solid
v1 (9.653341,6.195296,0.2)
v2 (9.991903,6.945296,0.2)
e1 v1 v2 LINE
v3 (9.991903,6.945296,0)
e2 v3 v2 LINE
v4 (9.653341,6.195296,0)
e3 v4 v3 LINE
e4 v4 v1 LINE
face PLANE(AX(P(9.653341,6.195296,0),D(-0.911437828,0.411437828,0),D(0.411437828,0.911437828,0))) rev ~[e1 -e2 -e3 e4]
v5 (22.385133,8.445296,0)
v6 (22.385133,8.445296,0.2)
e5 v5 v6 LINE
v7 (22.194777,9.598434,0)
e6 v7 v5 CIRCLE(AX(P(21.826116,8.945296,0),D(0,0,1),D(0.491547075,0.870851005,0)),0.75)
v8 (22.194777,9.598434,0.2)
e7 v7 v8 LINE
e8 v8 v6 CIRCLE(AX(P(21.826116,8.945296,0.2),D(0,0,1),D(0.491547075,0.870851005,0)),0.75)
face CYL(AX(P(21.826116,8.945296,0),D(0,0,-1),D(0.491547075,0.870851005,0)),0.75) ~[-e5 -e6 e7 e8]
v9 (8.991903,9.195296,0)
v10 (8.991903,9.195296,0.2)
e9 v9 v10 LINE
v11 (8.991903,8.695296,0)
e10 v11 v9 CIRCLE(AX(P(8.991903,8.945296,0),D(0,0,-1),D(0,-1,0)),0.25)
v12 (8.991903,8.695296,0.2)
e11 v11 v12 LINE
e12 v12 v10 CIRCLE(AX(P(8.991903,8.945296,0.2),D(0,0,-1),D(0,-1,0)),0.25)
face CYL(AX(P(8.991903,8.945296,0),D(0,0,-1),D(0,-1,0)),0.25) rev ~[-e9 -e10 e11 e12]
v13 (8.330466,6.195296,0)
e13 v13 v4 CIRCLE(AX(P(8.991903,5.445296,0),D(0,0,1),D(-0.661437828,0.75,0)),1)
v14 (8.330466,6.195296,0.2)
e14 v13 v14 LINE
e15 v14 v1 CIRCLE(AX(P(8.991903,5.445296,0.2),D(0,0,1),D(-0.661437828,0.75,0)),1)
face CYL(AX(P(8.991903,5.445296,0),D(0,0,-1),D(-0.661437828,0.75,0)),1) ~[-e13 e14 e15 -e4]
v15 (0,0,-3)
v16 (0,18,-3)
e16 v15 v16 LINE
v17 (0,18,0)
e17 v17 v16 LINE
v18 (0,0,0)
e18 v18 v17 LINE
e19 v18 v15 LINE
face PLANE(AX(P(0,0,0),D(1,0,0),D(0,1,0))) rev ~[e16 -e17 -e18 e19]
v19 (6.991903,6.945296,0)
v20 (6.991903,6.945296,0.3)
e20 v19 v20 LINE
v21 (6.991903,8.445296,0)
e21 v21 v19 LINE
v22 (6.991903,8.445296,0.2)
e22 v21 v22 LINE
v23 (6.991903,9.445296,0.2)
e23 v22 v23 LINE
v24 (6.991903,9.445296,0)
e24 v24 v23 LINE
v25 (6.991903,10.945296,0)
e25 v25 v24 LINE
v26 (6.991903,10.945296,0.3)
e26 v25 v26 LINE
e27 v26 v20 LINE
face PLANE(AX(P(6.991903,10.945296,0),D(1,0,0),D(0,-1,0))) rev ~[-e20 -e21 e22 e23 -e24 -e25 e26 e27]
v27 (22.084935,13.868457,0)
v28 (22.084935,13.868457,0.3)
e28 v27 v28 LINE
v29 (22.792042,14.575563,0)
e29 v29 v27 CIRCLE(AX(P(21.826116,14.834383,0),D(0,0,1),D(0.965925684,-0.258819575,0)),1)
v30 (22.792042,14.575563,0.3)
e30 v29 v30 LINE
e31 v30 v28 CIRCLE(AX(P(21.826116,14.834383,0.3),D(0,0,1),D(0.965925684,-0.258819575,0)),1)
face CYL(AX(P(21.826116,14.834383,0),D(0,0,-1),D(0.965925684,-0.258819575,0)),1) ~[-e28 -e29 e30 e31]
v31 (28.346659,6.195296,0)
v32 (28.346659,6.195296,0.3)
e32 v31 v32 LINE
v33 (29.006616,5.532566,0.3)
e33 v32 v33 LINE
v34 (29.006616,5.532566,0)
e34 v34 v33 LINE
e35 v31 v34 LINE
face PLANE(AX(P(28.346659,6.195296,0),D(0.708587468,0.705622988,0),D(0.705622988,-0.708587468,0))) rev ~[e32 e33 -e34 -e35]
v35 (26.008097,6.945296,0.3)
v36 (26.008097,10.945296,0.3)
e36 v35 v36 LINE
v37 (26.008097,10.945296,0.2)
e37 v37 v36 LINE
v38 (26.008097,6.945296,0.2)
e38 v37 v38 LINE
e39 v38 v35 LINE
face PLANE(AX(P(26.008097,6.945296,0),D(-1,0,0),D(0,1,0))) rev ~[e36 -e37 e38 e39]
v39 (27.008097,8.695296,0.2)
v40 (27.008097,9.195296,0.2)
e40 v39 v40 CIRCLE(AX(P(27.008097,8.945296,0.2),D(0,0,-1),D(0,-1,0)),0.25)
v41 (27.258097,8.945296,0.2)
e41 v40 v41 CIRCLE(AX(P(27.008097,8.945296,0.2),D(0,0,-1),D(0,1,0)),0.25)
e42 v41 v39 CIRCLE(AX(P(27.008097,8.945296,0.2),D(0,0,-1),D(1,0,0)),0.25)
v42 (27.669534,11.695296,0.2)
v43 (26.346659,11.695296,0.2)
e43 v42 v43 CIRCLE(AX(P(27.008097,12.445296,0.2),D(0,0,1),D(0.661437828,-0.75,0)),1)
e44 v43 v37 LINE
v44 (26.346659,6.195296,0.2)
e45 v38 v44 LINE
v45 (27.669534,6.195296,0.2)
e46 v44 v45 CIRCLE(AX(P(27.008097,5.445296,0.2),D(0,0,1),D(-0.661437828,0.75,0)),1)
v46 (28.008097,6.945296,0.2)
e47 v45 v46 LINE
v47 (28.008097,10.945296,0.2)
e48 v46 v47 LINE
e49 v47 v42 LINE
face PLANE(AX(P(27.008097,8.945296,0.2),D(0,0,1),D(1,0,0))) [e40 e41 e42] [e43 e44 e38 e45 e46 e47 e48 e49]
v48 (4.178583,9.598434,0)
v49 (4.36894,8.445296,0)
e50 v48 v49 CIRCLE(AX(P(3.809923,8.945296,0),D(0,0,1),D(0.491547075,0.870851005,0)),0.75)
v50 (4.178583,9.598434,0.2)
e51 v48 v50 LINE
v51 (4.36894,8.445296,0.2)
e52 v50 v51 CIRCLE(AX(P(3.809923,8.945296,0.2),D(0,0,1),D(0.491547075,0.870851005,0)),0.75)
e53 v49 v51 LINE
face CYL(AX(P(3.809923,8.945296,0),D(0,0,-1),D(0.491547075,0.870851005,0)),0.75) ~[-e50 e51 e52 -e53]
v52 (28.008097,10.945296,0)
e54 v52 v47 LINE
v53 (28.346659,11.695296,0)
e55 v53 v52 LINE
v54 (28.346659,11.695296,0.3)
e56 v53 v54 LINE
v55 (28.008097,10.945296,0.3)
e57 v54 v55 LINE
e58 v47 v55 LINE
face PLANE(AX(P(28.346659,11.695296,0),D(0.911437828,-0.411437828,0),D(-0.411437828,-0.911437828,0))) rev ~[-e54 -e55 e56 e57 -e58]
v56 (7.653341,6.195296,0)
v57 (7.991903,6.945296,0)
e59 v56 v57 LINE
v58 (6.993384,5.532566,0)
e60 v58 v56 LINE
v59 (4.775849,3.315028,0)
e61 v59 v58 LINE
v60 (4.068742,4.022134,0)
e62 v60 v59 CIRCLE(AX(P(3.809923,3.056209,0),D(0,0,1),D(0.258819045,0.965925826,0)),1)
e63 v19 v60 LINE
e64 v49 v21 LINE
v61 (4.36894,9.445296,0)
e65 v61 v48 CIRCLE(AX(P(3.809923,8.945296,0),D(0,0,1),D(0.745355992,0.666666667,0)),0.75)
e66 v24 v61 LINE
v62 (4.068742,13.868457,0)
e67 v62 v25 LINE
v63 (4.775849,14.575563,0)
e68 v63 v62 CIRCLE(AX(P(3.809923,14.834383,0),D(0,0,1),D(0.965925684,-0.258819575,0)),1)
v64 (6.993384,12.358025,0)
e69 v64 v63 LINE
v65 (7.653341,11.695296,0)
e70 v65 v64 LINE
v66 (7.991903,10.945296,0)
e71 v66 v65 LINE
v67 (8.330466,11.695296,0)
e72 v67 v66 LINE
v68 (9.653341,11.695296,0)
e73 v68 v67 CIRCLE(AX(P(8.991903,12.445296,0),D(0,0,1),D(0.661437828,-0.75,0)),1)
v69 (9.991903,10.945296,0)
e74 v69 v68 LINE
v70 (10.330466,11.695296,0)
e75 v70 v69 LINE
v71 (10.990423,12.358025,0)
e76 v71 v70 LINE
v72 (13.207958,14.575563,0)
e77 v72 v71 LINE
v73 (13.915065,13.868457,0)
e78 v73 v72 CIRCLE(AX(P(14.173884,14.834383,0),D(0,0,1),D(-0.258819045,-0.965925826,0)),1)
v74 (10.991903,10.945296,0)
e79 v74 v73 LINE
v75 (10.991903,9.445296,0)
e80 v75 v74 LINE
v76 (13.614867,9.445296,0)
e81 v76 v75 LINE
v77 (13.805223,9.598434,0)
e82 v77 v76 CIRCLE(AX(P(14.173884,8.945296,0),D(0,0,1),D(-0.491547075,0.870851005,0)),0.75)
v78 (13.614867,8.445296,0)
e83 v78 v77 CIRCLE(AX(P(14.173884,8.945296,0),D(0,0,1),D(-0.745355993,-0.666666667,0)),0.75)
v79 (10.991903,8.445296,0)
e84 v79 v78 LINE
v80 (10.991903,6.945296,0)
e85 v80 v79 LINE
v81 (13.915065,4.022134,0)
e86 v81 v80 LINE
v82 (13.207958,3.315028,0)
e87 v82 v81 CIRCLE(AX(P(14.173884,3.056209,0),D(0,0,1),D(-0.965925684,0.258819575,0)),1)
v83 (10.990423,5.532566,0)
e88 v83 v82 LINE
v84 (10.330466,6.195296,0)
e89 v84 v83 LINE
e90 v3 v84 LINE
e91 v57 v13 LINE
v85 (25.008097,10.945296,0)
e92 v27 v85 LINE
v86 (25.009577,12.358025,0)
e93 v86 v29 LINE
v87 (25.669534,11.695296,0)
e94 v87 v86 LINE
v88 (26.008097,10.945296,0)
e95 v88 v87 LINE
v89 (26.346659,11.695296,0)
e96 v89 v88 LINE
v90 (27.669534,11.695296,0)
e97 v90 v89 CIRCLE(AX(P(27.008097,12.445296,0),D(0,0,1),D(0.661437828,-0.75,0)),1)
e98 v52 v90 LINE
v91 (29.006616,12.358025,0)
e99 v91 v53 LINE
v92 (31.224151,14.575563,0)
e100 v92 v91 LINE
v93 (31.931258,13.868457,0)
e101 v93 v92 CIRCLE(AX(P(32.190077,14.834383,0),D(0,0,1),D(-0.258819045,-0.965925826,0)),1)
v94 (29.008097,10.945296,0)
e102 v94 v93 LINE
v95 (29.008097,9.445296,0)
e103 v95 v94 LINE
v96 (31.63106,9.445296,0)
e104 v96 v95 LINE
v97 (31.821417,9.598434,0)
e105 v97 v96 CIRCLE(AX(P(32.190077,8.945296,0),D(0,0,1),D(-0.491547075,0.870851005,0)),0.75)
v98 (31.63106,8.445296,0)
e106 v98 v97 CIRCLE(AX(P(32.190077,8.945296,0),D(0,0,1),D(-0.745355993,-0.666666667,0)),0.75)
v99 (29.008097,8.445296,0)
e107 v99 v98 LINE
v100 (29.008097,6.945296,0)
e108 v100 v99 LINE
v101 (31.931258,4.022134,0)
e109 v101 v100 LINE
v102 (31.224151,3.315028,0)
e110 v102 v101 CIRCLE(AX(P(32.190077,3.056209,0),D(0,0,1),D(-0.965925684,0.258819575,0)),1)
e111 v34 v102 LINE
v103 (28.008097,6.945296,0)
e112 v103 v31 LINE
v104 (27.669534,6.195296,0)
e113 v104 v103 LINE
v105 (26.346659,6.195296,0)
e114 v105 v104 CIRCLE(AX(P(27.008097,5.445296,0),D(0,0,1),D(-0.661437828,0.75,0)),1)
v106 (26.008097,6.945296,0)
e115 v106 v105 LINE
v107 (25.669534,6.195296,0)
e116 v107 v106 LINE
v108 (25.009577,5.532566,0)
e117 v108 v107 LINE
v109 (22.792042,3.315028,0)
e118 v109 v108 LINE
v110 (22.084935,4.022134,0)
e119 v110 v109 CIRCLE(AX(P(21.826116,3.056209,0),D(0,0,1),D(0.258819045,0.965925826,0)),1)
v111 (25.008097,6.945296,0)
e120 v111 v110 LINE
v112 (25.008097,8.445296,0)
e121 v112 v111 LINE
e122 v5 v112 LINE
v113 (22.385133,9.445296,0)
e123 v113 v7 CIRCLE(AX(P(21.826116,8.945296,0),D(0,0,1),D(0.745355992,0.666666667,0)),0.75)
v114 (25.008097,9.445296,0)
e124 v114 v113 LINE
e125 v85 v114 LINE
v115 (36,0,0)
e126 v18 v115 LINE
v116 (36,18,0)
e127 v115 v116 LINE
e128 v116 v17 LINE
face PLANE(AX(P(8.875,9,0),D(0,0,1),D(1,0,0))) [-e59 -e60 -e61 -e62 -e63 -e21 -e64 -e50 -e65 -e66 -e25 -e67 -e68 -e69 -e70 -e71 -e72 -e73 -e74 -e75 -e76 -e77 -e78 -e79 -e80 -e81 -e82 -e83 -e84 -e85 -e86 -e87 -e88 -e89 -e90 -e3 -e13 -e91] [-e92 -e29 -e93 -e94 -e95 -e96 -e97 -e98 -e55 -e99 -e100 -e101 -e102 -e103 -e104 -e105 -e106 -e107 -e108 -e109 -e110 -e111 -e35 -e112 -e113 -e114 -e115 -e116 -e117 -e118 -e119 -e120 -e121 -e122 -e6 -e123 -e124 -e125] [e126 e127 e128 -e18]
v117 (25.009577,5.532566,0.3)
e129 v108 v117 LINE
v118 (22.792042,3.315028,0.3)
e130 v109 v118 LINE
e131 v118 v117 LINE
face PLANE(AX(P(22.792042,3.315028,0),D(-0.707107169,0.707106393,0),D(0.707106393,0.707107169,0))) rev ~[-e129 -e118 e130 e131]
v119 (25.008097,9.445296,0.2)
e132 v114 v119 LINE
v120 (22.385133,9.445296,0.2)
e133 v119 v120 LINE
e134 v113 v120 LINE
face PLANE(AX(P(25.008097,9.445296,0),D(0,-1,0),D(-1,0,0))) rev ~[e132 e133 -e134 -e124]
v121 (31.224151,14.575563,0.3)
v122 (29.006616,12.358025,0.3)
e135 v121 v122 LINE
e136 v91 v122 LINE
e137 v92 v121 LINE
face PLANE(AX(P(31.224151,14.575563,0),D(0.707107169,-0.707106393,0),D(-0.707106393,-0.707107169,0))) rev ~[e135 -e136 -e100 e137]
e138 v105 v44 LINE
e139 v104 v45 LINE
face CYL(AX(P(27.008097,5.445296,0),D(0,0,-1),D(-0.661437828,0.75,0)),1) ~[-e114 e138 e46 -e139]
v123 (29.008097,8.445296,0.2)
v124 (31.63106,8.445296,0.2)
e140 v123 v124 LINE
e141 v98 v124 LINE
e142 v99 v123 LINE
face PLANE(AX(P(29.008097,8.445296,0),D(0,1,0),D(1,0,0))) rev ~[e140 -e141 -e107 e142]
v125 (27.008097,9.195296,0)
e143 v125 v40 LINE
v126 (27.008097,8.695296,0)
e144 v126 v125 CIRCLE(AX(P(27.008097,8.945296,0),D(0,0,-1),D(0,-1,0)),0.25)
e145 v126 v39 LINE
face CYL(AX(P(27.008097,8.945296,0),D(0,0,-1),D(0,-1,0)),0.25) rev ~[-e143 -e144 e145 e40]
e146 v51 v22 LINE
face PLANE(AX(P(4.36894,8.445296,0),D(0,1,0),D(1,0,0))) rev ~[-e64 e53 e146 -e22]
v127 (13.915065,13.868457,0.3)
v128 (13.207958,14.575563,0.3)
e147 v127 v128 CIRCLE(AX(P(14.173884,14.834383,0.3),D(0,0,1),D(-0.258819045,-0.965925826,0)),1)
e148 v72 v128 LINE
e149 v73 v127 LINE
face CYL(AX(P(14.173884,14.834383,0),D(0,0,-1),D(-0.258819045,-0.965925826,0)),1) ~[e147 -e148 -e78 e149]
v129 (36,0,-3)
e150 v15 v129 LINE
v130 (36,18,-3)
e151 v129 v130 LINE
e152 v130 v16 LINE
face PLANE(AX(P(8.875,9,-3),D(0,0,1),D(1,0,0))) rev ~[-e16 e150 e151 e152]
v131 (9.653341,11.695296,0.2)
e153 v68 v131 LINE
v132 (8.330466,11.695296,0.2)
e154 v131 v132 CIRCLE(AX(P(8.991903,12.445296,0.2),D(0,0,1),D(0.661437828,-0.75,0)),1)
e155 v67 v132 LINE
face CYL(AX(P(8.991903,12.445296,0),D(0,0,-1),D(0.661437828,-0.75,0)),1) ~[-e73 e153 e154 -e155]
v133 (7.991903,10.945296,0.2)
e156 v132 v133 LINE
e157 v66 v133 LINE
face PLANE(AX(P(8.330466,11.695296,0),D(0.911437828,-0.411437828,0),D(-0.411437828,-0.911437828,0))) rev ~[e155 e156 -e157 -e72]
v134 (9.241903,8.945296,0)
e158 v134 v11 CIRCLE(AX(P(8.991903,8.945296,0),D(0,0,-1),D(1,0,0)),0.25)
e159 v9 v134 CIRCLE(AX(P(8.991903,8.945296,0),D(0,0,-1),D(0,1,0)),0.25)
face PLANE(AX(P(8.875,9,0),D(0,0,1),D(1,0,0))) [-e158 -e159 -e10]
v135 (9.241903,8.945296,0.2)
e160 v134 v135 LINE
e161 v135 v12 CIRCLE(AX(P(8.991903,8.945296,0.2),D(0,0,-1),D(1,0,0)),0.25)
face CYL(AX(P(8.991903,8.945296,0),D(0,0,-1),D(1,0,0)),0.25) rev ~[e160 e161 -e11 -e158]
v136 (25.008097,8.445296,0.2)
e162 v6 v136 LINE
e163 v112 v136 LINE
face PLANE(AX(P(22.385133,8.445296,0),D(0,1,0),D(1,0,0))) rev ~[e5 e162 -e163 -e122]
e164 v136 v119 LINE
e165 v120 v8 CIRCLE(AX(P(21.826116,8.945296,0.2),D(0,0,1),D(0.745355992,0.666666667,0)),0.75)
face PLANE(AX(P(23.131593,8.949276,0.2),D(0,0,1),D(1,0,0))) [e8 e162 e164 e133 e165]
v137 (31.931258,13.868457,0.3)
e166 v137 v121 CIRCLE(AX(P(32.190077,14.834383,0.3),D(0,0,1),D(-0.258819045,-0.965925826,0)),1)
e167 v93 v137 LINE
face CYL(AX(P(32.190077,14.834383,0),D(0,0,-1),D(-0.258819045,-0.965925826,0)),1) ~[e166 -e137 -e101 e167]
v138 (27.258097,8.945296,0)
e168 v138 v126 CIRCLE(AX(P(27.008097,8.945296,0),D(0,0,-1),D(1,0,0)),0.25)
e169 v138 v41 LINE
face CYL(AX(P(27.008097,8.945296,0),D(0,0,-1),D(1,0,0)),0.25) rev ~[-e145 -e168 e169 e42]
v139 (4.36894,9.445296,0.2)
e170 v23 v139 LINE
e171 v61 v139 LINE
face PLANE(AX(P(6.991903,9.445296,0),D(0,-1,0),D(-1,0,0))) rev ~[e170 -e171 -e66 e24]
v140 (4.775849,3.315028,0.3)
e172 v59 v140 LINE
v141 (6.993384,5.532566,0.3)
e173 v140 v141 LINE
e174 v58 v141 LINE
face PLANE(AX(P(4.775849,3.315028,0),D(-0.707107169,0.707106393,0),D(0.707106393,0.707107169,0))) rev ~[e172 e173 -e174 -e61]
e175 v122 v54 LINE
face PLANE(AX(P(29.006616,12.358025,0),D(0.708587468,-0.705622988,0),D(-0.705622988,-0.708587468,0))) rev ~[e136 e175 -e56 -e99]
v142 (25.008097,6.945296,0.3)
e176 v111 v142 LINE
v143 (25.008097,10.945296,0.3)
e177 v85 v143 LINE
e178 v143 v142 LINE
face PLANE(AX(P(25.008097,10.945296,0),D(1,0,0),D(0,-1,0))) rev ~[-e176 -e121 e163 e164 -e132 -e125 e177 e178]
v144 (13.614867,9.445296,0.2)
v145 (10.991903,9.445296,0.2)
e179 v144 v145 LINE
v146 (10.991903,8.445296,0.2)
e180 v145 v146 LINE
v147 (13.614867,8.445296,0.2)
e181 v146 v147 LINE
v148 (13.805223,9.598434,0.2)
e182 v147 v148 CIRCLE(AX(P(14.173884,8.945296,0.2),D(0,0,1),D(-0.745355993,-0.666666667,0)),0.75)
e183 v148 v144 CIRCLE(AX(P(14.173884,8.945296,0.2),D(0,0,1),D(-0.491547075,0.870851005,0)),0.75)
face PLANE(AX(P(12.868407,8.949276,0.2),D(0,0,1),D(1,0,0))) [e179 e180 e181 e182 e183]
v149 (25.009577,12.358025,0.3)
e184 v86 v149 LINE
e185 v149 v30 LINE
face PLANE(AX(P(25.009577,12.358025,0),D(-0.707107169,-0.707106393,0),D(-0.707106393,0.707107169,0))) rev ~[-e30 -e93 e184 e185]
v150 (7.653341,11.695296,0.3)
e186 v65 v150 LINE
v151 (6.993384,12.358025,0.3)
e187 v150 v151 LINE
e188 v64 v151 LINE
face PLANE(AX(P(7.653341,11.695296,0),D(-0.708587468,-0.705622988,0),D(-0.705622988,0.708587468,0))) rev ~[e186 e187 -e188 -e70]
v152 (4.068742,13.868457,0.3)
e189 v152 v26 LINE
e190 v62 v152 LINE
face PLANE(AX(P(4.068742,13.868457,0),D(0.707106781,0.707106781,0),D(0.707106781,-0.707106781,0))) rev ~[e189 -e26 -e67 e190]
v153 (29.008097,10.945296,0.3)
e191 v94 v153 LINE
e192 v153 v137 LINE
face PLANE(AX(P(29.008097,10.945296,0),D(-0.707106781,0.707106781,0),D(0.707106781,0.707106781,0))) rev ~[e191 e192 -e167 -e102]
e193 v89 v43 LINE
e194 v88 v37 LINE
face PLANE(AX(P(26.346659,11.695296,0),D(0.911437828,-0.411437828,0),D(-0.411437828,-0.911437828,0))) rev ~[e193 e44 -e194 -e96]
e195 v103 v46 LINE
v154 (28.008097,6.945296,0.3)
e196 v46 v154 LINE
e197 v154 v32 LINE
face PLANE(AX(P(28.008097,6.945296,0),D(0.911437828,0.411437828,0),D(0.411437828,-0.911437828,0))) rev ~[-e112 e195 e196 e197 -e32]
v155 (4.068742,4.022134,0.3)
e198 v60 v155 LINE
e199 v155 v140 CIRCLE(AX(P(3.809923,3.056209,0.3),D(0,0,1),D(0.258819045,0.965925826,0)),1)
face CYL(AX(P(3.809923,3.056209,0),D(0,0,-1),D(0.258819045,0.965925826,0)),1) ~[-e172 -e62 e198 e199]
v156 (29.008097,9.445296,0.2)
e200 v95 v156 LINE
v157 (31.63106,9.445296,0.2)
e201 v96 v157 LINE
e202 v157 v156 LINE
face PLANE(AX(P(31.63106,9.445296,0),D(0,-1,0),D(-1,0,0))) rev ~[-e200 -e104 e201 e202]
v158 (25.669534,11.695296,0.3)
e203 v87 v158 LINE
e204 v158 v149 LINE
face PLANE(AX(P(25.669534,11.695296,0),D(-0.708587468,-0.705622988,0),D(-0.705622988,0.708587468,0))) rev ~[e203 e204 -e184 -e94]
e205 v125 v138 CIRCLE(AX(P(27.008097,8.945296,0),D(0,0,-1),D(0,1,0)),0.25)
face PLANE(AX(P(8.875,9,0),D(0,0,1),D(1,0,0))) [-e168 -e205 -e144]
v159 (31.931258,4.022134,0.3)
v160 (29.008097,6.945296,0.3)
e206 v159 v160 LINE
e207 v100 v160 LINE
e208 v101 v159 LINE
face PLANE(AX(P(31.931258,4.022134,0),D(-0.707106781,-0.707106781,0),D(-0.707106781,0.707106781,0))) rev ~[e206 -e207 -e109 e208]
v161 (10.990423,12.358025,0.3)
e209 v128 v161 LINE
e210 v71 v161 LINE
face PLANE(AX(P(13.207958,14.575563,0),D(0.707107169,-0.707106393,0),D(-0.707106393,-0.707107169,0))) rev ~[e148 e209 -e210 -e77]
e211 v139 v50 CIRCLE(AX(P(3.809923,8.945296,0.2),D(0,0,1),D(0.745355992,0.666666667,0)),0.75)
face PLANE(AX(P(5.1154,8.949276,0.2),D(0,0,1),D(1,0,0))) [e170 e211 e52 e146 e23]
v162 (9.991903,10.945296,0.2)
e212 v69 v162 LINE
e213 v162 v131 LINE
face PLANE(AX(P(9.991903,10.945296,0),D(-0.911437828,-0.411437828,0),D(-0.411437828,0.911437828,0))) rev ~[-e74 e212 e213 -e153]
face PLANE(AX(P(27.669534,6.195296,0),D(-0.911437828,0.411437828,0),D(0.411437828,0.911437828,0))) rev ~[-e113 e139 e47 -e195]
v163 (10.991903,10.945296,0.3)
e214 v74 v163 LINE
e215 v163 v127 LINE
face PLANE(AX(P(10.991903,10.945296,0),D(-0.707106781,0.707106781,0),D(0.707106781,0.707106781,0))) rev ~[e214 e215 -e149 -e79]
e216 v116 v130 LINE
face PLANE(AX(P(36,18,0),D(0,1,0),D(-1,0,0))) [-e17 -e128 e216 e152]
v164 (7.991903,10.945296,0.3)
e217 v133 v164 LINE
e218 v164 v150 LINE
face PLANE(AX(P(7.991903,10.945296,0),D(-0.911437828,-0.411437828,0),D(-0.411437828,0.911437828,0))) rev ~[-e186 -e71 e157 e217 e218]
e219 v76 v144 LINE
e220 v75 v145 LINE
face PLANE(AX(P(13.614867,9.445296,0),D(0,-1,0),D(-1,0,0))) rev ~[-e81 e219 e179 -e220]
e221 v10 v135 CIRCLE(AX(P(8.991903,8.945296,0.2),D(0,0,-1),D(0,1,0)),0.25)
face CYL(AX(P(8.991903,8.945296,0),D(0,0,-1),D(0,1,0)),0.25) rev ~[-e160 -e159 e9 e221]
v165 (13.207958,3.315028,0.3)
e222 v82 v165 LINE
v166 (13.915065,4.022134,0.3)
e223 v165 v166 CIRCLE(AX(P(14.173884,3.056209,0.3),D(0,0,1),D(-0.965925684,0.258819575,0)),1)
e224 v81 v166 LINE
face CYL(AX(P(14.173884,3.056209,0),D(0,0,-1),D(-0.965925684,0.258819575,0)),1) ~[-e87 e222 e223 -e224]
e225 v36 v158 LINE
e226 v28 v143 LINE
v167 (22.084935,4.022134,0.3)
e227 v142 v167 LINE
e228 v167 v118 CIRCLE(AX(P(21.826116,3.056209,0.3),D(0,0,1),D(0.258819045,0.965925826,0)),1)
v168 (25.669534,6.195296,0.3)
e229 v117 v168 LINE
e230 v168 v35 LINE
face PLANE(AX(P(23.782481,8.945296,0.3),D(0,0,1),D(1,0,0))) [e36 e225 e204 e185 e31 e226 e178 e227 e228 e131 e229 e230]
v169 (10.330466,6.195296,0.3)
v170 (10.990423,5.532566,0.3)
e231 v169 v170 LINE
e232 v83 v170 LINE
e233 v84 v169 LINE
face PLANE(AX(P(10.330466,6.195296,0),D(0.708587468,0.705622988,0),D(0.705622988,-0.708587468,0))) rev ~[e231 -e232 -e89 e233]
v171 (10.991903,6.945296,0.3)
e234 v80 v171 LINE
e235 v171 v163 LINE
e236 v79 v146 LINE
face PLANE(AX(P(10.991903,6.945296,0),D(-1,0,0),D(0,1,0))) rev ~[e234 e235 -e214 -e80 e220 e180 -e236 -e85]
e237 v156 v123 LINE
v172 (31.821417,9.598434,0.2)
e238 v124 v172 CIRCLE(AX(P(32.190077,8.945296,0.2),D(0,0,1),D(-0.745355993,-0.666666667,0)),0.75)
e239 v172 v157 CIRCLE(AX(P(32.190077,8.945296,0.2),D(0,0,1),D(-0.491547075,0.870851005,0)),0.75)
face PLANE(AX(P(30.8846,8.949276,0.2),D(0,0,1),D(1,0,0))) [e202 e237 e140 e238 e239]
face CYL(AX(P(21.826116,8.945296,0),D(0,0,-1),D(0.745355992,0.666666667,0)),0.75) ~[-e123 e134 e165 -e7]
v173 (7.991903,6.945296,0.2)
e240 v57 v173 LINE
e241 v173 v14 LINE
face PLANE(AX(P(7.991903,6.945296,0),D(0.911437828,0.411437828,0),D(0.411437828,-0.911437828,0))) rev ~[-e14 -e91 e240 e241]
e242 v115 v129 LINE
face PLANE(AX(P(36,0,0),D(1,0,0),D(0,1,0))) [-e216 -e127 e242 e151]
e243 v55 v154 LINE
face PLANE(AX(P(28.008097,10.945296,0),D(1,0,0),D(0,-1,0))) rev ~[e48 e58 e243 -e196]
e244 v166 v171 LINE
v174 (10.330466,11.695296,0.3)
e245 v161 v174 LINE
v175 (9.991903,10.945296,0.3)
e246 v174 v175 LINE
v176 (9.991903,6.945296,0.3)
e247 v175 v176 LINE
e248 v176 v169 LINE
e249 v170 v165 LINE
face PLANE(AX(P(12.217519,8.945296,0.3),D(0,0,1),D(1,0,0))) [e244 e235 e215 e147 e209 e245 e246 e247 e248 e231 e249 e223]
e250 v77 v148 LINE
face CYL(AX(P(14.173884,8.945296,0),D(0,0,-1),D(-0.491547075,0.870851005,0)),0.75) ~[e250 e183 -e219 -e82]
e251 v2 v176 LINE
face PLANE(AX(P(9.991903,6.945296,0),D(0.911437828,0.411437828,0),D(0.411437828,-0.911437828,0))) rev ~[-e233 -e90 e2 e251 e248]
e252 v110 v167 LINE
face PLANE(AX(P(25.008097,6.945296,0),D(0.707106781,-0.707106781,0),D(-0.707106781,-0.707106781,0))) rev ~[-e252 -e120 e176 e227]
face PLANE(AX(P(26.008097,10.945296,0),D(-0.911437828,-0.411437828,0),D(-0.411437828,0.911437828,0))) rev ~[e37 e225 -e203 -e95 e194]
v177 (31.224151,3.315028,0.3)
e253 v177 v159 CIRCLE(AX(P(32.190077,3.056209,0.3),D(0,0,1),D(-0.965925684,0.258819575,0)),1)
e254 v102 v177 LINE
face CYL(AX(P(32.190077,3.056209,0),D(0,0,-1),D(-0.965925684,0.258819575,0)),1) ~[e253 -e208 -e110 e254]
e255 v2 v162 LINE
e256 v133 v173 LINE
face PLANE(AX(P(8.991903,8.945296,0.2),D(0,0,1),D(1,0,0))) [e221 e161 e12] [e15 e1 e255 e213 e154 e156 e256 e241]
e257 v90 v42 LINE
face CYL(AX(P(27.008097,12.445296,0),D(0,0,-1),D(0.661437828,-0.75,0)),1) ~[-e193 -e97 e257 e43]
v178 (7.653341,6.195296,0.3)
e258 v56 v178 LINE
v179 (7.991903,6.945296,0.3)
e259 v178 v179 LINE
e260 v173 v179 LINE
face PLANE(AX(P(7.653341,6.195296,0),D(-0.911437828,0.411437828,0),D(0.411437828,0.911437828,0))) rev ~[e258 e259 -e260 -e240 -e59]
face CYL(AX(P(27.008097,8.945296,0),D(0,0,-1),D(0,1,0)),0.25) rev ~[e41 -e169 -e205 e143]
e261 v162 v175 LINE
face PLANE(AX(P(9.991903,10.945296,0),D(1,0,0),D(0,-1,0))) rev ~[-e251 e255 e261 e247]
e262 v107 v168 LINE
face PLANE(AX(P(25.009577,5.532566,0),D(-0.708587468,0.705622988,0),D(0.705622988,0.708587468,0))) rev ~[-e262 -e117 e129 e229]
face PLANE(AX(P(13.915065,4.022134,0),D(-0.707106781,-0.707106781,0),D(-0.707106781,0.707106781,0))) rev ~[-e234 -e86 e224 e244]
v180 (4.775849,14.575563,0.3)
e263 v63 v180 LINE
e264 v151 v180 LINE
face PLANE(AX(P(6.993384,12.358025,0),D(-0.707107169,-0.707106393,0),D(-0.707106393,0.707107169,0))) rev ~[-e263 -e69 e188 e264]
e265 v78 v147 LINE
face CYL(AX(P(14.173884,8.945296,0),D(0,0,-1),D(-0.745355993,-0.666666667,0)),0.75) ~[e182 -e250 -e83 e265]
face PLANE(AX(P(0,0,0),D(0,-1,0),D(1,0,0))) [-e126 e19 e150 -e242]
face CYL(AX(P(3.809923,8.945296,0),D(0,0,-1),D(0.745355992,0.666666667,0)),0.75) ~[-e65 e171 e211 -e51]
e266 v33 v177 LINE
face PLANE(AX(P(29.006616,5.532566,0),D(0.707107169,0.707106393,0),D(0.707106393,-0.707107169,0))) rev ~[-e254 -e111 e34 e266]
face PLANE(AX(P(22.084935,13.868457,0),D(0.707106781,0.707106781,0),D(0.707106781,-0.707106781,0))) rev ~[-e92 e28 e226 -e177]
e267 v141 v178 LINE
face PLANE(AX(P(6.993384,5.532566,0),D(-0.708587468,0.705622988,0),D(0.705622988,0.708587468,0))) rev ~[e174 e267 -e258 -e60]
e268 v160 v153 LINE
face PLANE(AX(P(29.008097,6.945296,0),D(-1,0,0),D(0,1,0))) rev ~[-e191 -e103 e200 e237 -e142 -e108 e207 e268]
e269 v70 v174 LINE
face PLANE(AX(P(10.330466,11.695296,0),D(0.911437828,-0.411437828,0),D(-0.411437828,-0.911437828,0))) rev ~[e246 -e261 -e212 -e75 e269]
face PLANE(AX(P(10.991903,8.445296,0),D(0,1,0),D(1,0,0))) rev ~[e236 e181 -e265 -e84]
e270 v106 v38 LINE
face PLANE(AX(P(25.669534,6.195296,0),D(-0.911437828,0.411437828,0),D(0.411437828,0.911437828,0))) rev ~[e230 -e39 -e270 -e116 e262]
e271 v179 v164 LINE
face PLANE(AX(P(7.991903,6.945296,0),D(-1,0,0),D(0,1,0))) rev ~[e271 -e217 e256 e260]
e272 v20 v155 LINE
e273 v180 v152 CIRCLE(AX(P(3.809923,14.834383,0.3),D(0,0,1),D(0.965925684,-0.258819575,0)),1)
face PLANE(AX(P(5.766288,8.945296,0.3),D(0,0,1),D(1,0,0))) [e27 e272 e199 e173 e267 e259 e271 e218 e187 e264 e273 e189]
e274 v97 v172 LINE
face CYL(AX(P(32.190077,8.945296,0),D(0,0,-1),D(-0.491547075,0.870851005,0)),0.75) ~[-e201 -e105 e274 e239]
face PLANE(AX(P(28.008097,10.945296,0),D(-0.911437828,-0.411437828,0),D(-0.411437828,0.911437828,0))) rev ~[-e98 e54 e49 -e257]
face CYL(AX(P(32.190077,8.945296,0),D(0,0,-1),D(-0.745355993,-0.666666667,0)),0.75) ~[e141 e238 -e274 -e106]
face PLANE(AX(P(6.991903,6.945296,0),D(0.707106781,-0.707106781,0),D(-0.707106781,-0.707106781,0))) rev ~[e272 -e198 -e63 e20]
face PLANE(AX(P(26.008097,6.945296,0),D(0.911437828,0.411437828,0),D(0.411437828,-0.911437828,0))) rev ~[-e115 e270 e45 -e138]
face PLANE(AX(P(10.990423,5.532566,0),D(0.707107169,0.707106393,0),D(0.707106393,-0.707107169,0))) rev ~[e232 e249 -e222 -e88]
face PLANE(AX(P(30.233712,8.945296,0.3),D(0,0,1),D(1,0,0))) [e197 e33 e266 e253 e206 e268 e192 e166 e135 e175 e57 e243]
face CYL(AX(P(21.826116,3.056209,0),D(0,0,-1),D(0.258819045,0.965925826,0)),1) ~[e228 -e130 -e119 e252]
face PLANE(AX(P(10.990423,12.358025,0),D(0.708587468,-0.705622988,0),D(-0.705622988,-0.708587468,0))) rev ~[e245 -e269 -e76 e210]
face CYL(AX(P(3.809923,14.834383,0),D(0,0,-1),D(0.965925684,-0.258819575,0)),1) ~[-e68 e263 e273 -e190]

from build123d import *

# Parameters (mm, degrees)
F0_W     = 17.75
F0_H     = 18
F0_W_2   = 0.25
F1_DEPTH = 3
F2_DEPTH = 0.3
F3_DEPTH = 0.2


# Not quite as in the source:
# - a feature names something its author has since deleted; it is built from what else it names


with BuildPart() as f1:
    # F0 (on Top) → F1 (new body)
    with BuildSketch(Plane.XY):
        with Locations((8.875, 9)):
            Rectangle(F0_W, F0_H)
        with BuildLine():
            Line((9.6533412223, 11.6952957055), (9.9919033945, 10.9452957055))
            Line((9.9919033945, 10.9452957055), (10.3304655668, 11.6952957055))
            Line((10.3304655668, 11.6952957055), (10.9904227081, 12.3580254744))
            Line((10.9904227081, 12.3580254744), (13.2079580316, 14.5755632326))
            ThreePointArc((13.2079580316, 14.5755632326), (14.8809903029, 15.5414897832), (13.9150646707, 13.8684569817))
            Line((13.9150646707, 13.8684569817), (10.9919033945, 10.9452957055))
            Line((10.9919033945, 10.9452957055), (10.9919033945, 9.4452957055))
            Line((10.9919033945, 9.4452957055), (13.6148667214, 9.4452957055))
            ThreePointArc((13.6148667214, 9.4452957055), (13.70376764, 9.5296679116), (13.8052234095, 9.5984339593))
            ThreePointArc((13.8052234095, 9.5984339593), (14.9138690208, 8.823141097), (13.6148667214, 8.4452957055))
            Line((13.6148667214, 8.4452957055), (10.9919033945, 8.4452957055))
            Line((10.9919033945, 8.4452957055), (10.9919033945, 6.9452957055))
            Line((10.9919033945, 6.9452957055), (13.9150646707, 4.0221344294))
            ThreePointArc((13.9150646707, 4.0221344294), (14.8809903029, 2.3491016278), (13.2079580316, 3.3150281785))
            Line((13.2079580316, 3.3150281785), (10.9904227081, 5.5325659367))
            Line((10.9904227081, 5.5325659367), (10.3304655668, 6.1952957055))
            Line((10.3304655668, 6.1952957055), (9.9919033945, 6.9452957055))
            Line((9.9919033945, 6.9452957055), (9.6533412223, 6.1952957055))
            ThreePointArc((9.6533412223, 6.1952957055), (8.9919033945, 4.4452957055), (8.3304655668, 6.1952957055))
            Line((8.3304655668, 6.1952957055), (7.9919033945, 6.9452957055))
            Line((7.9919033945, 6.9452957055), (7.6533412223, 6.1952957055))
            Line((7.6533412223, 6.1952957055), (6.993384081, 5.5325659367))
            Line((6.993384081, 5.5325659367), (4.7758487575, 3.3150281785))
            ThreePointArc((4.7758487575, 3.3150281785), (3.1028164862, 2.3491016278), (4.0687421184, 4.0221344294))
            Line((4.0687421184, 4.0221344294), (6.9919033945, 6.9452957055))
            Line((6.9919033945, 6.9452957055), (6.9919033945, 8.4452957055))
            Line((6.9919033945, 8.4452957055), (4.3689400677, 8.4452957055))
            ThreePointArc((4.3689400677, 8.4452957055), (3.0699377683, 8.823141097), (4.1785833795, 9.5984339593))
            ThreePointArc((4.1785833795, 9.5984339593), (4.2800391491, 9.5296679116), (4.3689400677, 9.4452957055))
            Line((4.3689400677, 9.4452957055), (6.9919033945, 9.4452957055))
            Line((6.9919033945, 9.4452957055), (6.9919033945, 10.9452957055))
            Line((6.9919033945, 10.9452957055), (4.0687421184, 13.8684569817))
            ThreePointArc((4.0687421184, 13.8684569817), (3.1028164862, 15.5414897832), (4.7758487575, 14.5755632326))
            Line((4.7758487575, 14.5755632326), (6.993384081, 12.3580254744))
            Line((6.993384081, 12.3580254744), (7.6533412223, 11.6952957055))
            Line((7.6533412223, 11.6952957055), (7.9919033945, 10.9452957055))
            Line((7.9919033945, 10.9452957055), (8.3304655668, 11.6952957055))
            ThreePointArc((8.3304655668, 11.6952957055), (8.9919033945, 13.4452957055), (9.6533412223, 11.6952957055))
        make_face(mode=Mode.SUBTRACT)
        with Locations((27.125, 9)):
            Rectangle(F0_W, F0_H)
        with BuildLine():
            Line((27.6695344332, 11.6952957055), (28.0080966055, 10.9452957055))
            Line((28.0080966055, 10.9452957055), (28.3466587777, 11.6952957055))
            Line((28.3466587777, 11.6952957055), (29.006615919, 12.3580254744))
            Line((29.006615919, 12.3580254744), (31.2241512425, 14.5755632326))
            ThreePointArc((31.2241512425, 14.5755632326), (32.8971835138, 15.5414897832), (31.9312578816, 13.8684569817))
            Line((31.9312578816, 13.8684569817), (29.0080966055, 10.9452957055))
            Line((29.0080966055, 10.9452957055), (29.0080966055, 9.4452957055))
            Line((29.0080966055, 9.4452957055), (31.6310599323, 9.4452957055))
            ThreePointArc((31.6310599323, 9.4452957055), (31.7199608509, 9.5296679116), (31.8214166205, 9.5984339593))
            ThreePointArc((31.8214166205, 9.5984339593), (32.9300622317, 8.823141097), (31.6310599323, 8.4452957055))
            Line((31.6310599323, 8.4452957055), (29.0080966055, 8.4452957055))
            Line((29.0080966055, 8.4452957055), (29.0080966055, 6.9452957055))
            Line((29.0080966055, 6.9452957055), (31.9312578816, 4.0221344294))
            ThreePointArc((31.9312578816, 4.0221344294), (32.8971835138, 2.3491016278), (31.2241512425, 3.3150281785))
            Line((31.2241512425, 3.3150281785), (29.006615919, 5.5325659367))
            Line((29.006615919, 5.5325659367), (28.3466587777, 6.1952957055))
            Line((28.3466587777, 6.1952957055), (28.0080966055, 6.9452957055))
            Line((28.0080966055, 6.9452957055), (27.6695344332, 6.1952957055))
            ThreePointArc((27.6695344332, 6.1952957055), (27.0080966055, 4.4452957055), (26.3466587777, 6.1952957055))
            Line((26.3466587777, 6.1952957055), (26.0080966055, 6.9452957055))
            Line((26.0080966055, 6.9452957055), (25.6695344332, 6.1952957055))
            Line((25.6695344332, 6.1952957055), (25.0095772919, 5.5325659367))
            Line((25.0095772919, 5.5325659367), (22.7920419684, 3.3150281785))
            ThreePointArc((22.7920419684, 3.3150281785), (21.1190096971, 2.3491016278), (22.0849353293, 4.0221344294))
            Line((22.0849353293, 4.0221344294), (25.0080966055, 6.9452957055))
            Line((25.0080966055, 6.9452957055), (25.0080966055, 8.4452957055))
            Line((25.0080966055, 8.4452957055), (22.3851332786, 8.4452957055))
            ThreePointArc((22.3851332786, 8.4452957055), (21.0861309792, 8.823141097), (22.1947765905, 9.5984339593))
            ThreePointArc((22.1947765905, 9.5984339593), (22.29623236, 9.5296679116), (22.3851332786, 9.4452957055))
            Line((22.3851332786, 9.4452957055), (25.0080966055, 9.4452957055))
            Line((25.0080966055, 9.4452957055), (25.0080966055, 10.9452957055))
            Line((25.0080966055, 10.9452957055), (22.0849353293, 13.8684569817))
            ThreePointArc((22.0849353293, 13.8684569817), (21.1190096971, 15.5414897832), (22.7920419684, 14.5755632326))
            Line((22.7920419684, 14.5755632326), (25.0095772919, 12.3580254744))
            Line((25.0095772919, 12.3580254744), (25.6695344332, 11.6952957055))
            Line((25.6695344332, 11.6952957055), (26.0080966055, 10.9452957055))
            Line((26.0080966055, 10.9452957055), (26.3466587777, 11.6952957055))
            ThreePointArc((26.3466587777, 11.6952957055), (27.0080966055, 13.4452957055), (27.6695344332, 11.6952957055))
        make_face(mode=Mode.SUBTRACT)
        with BuildLine():
            Line((26.0080966055, 8.9452957055), (26.0080966055, 10.9452957055))
            Line((26.0080966055, 10.9452957055), (25.6695344332, 11.6952957055))
            Line((25.6695344332, 11.6952957055), (25.0095772919, 12.3580254744))
            Line((25.0095772919, 12.3580254744), (22.7920419684, 14.5755632326))
            ThreePointArc((22.7920419684, 14.5755632326), (21.1190096971, 15.5414897832), (22.0849353293, 13.8684569817))
            Line((22.0849353293, 13.8684569817), (25.0080966055, 10.9452957055))
            Line((25.0080966055, 10.9452957055), (25.0080966055, 9.4452957055))
            Line((25.0080966055, 9.4452957055), (25.0080966055, 8.9452957055))
            Line((25.0080966055, 8.9452957055), (25.0080966055, 8.4452957055))
            Line((25.0080966055, 8.4452957055), (25.0080966055, 6.9452957055))
            Line((25.0080966055, 6.9452957055), (22.0849353293, 4.0221344294))
            ThreePointArc((22.0849353293, 4.0221344294), (21.1190096971, 2.3491016278), (22.7920419684, 3.3150281785))
            Line((22.7920419684, 3.3150281785), (25.0095772919, 5.5325659367))
            Line((25.0095772919, 5.5325659367), (25.6695344332, 6.1952957055))
            Line((25.6695344332, 6.1952957055), (26.0080966055, 6.9452957055))
            Line((26.0080966055, 6.9452957055), (26.0080966055, 8.9452957055))
        make_face()
        with BuildLine():
            Line((28.3466587777, 11.6952957055), (28.0080966055, 10.9452957055))
            Line((28.0080966055, 10.9452957055), (28.0080966055, 8.9452957055))
            Line((28.0080966055, 8.9452957055), (28.0080966055, 6.9452957055))
            Line((28.0080966055, 6.9452957055), (28.3466587777, 6.1952957055))
            Line((28.3466587777, 6.1952957055), (29.006615919, 5.5325659367))
            Line((29.006615919, 5.5325659367), (31.2241512425, 3.3150281785))
            ThreePointArc((31.2241512425, 3.3150281785), (32.8971835138, 2.3491016278), (31.9312578816, 4.0221344294))
            Line((31.9312578816, 4.0221344294), (29.0080966055, 6.9452957055))
            Line((29.0080966055, 6.9452957055), (29.0080966055, 8.4452957055))
            Line((29.0080966055, 8.4452957055), (29.0080966055, 8.9452957055))
            Line((29.0080966055, 8.9452957055), (29.0080966055, 9.4452957055))
            Line((29.0080966055, 9.4452957055), (29.0080966055, 10.9452957055))
            Line((29.0080966055, 10.9452957055), (31.9312578816, 13.8684569817))
            ThreePointArc((31.9312578816, 13.8684569817), (32.8971835138, 15.5414897832), (31.2241512425, 14.5755632326))
            Line((31.2241512425, 14.5755632326), (29.006615919, 12.3580254744))
            Line((29.006615919, 12.3580254744), (28.3466587777, 11.6952957055))
        make_face()
        with BuildLine():
            Line((7.9919033945, 8.9452957055), (7.9919033945, 10.9452957055))
            Line((7.9919033945, 10.9452957055), (7.6533412223, 11.6952957055))
            Line((7.6533412223, 11.6952957055), (6.993384081, 12.3580254744))
            Line((6.993384081, 12.3580254744), (4.7758487575, 14.5755632326))
            ThreePointArc((4.7758487575, 14.5755632326), (3.1028164862, 15.5414897832), (4.0687421184, 13.8684569817))
            Line((4.0687421184, 13.8684569817), (6.9919033945, 10.9452957055))
            Line((6.9919033945, 10.9452957055), (6.9919033945, 9.4452957055))
            Line((6.9919033945, 9.4452957055), (6.9919033945, 8.9452957055))
            Line((6.9919033945, 8.9452957055), (6.9919033945, 8.4452957055))
            Line((6.9919033945, 8.4452957055), (6.9919033945, 6.9452957055))
            Line((6.9919033945, 6.9452957055), (4.0687421184, 4.0221344294))
            ThreePointArc((4.0687421184, 4.0221344294), (3.1028164862, 2.3491016278), (4.7758487575, 3.3150281785))
            Line((4.7758487575, 3.3150281785), (6.993384081, 5.5325659367))
            Line((6.993384081, 5.5325659367), (7.6533412223, 6.1952957055))
            Line((7.6533412223, 6.1952957055), (7.9919033945, 6.9452957055))
            Line((7.9919033945, 6.9452957055), (7.9919033945, 8.9452957055))
        make_face()
        with BuildLine():
            Line((9.9919033945, 10.9452957055), (9.9919033945, 8.9452957055))
            Line((9.9919033945, 8.9452957055), (9.9919033945, 6.9452957055))
            Line((9.9919033945, 6.9452957055), (10.3304655668, 6.1952957055))
            Line((10.3304655668, 6.1952957055), (10.9904227081, 5.5325659367))
            Line((10.9904227081, 5.5325659367), (13.2079580316, 3.3150281785))
            ThreePointArc((13.2079580316, 3.3150281785), (14.8809903029, 2.3491016278), (13.9150646707, 4.0221344294))
            Line((13.9150646707, 4.0221344294), (10.9919033945, 6.9452957055))
            Line((10.9919033945, 6.9452957055), (10.9919033945, 8.4452957055))
            Line((10.9919033945, 8.4452957055), (10.9919033945, 8.9452957055))
            Line((10.9919033945, 8.9452957055), (10.9919033945, 9.4452957055))
            Line((10.9919033945, 9.4452957055), (10.9919033945, 10.9452957055))
            Line((10.9919033945, 10.9452957055), (13.9150646707, 13.8684569817))
            ThreePointArc((13.9150646707, 13.8684569817), (14.8809903029, 15.5414897832), (13.2079580316, 14.5755632326))
            Line((13.2079580316, 14.5755632326), (10.9904227081, 12.3580254744))
            Line((10.9904227081, 12.3580254744), (10.3304655668, 11.6952957055))
            Line((10.3304655668, 11.6952957055), (9.9919033945, 10.9452957055))
        make_face()
        with BuildLine():
            Line((28.0080966055, 8.9452957055), (28.0080966055, 10.9452957055))
            Line((28.0080966055, 10.9452957055), (27.6695344332, 11.6952957055))
            ThreePointArc((27.6695344332, 11.6952957055), (27.0080966055, 13.4452957055), (26.3466587777, 11.6952957055))
            Line((26.3466587777, 11.6952957055), (26.0080966055, 10.9452957055))
            Line((26.0080966055, 10.9452957055), (26.0080966055, 8.9452957055))
            Line((26.0080966055, 8.9452957055), (26.0080966055, 6.9452957055))
            Line((26.0080966055, 6.9452957055), (26.3466587777, 6.1952957055))
            ThreePointArc((26.3466587777, 6.1952957055), (27.0080966055, 4.4452957055), (27.6695344332, 6.1952957055))
            Line((27.6695344332, 6.1952957055), (28.0080966055, 6.9452957055))
            Line((28.0080966055, 6.9452957055), (28.0080966055, 8.9452957055))
        make_face()
        with BuildLine():
            ThreePointArc((27.0080966055, 9.1952957055), (27.1848733008, 9.1220724008), (27.2580966055, 8.9452957055))
            ThreePointArc((27.2580966055, 8.9452957055), (27.1848733008, 8.7685190102), (27.0080966055, 8.6952957055))
            ThreePointArc((27.0080966055, 8.6952957055), (26.7580966055, 8.9452957055), (27.0080966055, 9.1952957055))
        make_face(mode=Mode.SUBTRACT)
        with BuildLine():
            Line((9.9919033945, 6.9452957055), (9.9919033945, 8.9452957055))
            Line((9.9919033945, 8.9452957055), (9.9919033945, 10.9452957055))
            Line((9.9919033945, 10.9452957055), (9.6533412223, 11.6952957055))
            ThreePointArc((9.6533412223, 11.6952957055), (8.9919033945, 13.4452957055), (8.3304655668, 11.6952957055))
            Line((8.3304655668, 11.6952957055), (7.9919033945, 10.9452957055))
            Line((7.9919033945, 10.9452957055), (7.9919033945, 8.9452957055))
            Line((7.9919033945, 8.9452957055), (7.9919033945, 6.9452957055))
            Line((7.9919033945, 6.9452957055), (8.3304655668, 6.1952957055))
            ThreePointArc((8.3304655668, 6.1952957055), (8.9919033945, 4.4452957055), (9.6533412223, 6.1952957055))
            Line((9.6533412223, 6.1952957055), (9.9919033945, 6.9452957055))
        make_face()
        with BuildLine():
            ThreePointArc((8.9919033945, 9.1952957055), (9.1686800898, 9.1220724008), (9.2419033945, 8.9452957055))
            ThreePointArc((9.2419033945, 8.9452957055), (9.1686800898, 8.7685190102), (8.9919033945, 8.6952957055))
            ThreePointArc((8.9919033945, 8.6952957055), (8.7419033945, 8.9452957055), (8.9919033945, 9.1952957055))
        make_face(mode=Mode.SUBTRACT)
        with Locations((17.875, 9)):
            Rectangle(F0_W_2, F0_H)
        with Locations((18.125, 9)):
            Rectangle(F0_W_2, F0_H)
        with BuildLine():
            Line((6.9919033945, 8.9452957055), (6.9919033945, 9.4452957055))
            Line((6.9919033945, 9.4452957055), (4.3689400677, 9.4452957055))
            ThreePointArc((4.3689400677, 9.4452957055), (4.2800391491, 9.5296679116), (4.1785833795, 9.5984339593))
            ThreePointArc((4.1785833795, 9.5984339593), (3.0699377683, 8.823141097), (4.3689400677, 8.4452957055))
            Line((4.3689400677, 8.4452957055), (6.9919033945, 8.4452957055))
            Line((6.9919033945, 8.4452957055), (6.9919033945, 8.9452957055))
        make_face()
        with BuildLine():
            Line((31.6310599323, 9.4452957055), (29.0080966055, 9.4452957055))
            Line((29.0080966055, 9.4452957055), (29.0080966055, 8.9452957055))
            Line((29.0080966055, 8.9452957055), (29.0080966055, 8.4452957055))
            Line((29.0080966055, 8.4452957055), (31.6310599323, 8.4452957055))
            ThreePointArc((31.6310599323, 8.4452957055), (32.9300622317, 8.823141097), (31.8214166205, 9.5984339593))
            ThreePointArc((31.8214166205, 9.5984339593), (31.7199608509, 9.5296679116), (31.6310599323, 9.4452957055))
        make_face()
        with BuildLine():
            Line((25.0080966055, 8.9452957055), (25.0080966055, 9.4452957055))
            Line((25.0080966055, 9.4452957055), (22.3851332786, 9.4452957055))
            ThreePointArc((22.3851332786, 9.4452957055), (22.29623236, 9.5296679116), (22.1947765905, 9.5984339593))
            ThreePointArc((22.1947765905, 9.5984339593), (21.0861309792, 8.823141097), (22.3851332786, 8.4452957055))
            Line((22.3851332786, 8.4452957055), (25.0080966055, 8.4452957055))
            Line((25.0080966055, 8.4452957055), (25.0080966055, 8.9452957055))
        make_face()
        with BuildLine():
            Line((13.6148667214, 9.4452957055), (10.9919033945, 9.4452957055))
            Line((10.9919033945, 9.4452957055), (10.9919033945, 8.9452957055))
            Line((10.9919033945, 8.9452957055), (10.9919033945, 8.4452957055))
            Line((10.9919033945, 8.4452957055), (13.6148667214, 8.4452957055))
            ThreePointArc((13.6148667214, 8.4452957055), (14.9138690208, 8.823141097), (13.8052234095, 9.5984339593))
            ThreePointArc((13.8052234095, 9.5984339593), (13.70376764, 9.5296679116), (13.6148667214, 9.4452957055))
        make_face()
        with BuildLine():
            ThreePointArc((8.9919033945, 8.6952957055), (9.1686800898, 8.7685190102), (9.2419033945, 8.9452957055))
            ThreePointArc((9.2419033945, 8.9452957055), (9.1686800898, 9.1220724008), (8.9919033945, 9.1952957055))
            Line((8.9919033945, 9.1952957055), (8.9919033945, 8.6952957055))
        make_face()
        with BuildLine():
            ThreePointArc((27.0080966055, 8.6952957055), (27.1848733008, 8.7685190102), (27.2580966055, 8.9452957055))
            ThreePointArc((27.2580966055, 8.9452957055), (27.1848733008, 9.1220724008), (27.0080966055, 9.1952957055))
            Line((27.0080966055, 9.1952957055), (27.0080966055, 8.6952957055))
        make_face()
        with BuildLine():
            Line((8.9919033945, 8.6952957055), (8.9919033945, 9.1952957055))
            ThreePointArc((8.9919033945, 9.1952957055), (8.7419033945, 8.9452957055), (8.9919033945, 8.6952957055))
        make_face()
        with BuildLine():
            Line((27.0080966055, 8.6952957055), (27.0080966055, 9.1952957055))
            ThreePointArc((27.0080966055, 9.1952957055), (26.7580966055, 8.9452957055), (27.0080966055, 8.6952957055))
        make_face()
    extrude(amount=-F1_DEPTH)

    # F0 (on Top) → F2 (join)
    with BuildSketch(Plane.XY):
        with BuildLine():
            Line((7.9919033945, 8.9452957055), (7.9919033945, 10.9452957055))
            Line((7.9919033945, 10.9452957055), (7.6533412223, 11.6952957055))
            Line((7.6533412223, 11.6952957055), (6.993384081, 12.3580254744))
            Line((6.993384081, 12.3580254744), (4.7758487575, 14.5755632326))
            ThreePointArc((4.7758487575, 14.5755632326), (3.1028164862, 15.5414897832), (4.0687421184, 13.8684569817))
            Line((4.0687421184, 13.8684569817), (6.9919033945, 10.9452957055))
            Line((6.9919033945, 10.9452957055), (6.9919033945, 9.4452957055))
            Line((6.9919033945, 9.4452957055), (6.9919033945, 8.9452957055))
            Line((6.9919033945, 8.9452957055), (6.9919033945, 8.4452957055))
            Line((6.9919033945, 8.4452957055), (6.9919033945, 6.9452957055))
            Line((6.9919033945, 6.9452957055), (4.0687421184, 4.0221344294))
            ThreePointArc((4.0687421184, 4.0221344294), (3.1028164862, 2.3491016278), (4.7758487575, 3.3150281785))
            Line((4.7758487575, 3.3150281785), (6.993384081, 5.5325659367))
            Line((6.993384081, 5.5325659367), (7.6533412223, 6.1952957055))
            Line((7.6533412223, 6.1952957055), (7.9919033945, 6.9452957055))
            Line((7.9919033945, 6.9452957055), (7.9919033945, 8.9452957055))
        make_face()
        with BuildLine():
            Line((9.9919033945, 10.9452957055), (9.9919033945, 8.9452957055))
            Line((9.9919033945, 8.9452957055), (9.9919033945, 6.9452957055))
            Line((9.9919033945, 6.9452957055), (10.3304655668, 6.1952957055))
            Line((10.3304655668, 6.1952957055), (10.9904227081, 5.5325659367))
            Line((10.9904227081, 5.5325659367), (13.2079580316, 3.3150281785))
            ThreePointArc((13.2079580316, 3.3150281785), (14.8809903029, 2.3491016278), (13.9150646707, 4.0221344294))
            Line((13.9150646707, 4.0221344294), (10.9919033945, 6.9452957055))
            Line((10.9919033945, 6.9452957055), (10.9919033945, 8.4452957055))
            Line((10.9919033945, 8.4452957055), (10.9919033945, 8.9452957055))
            Line((10.9919033945, 8.9452957055), (10.9919033945, 9.4452957055))
            Line((10.9919033945, 9.4452957055), (10.9919033945, 10.9452957055))
            Line((10.9919033945, 10.9452957055), (13.9150646707, 13.8684569817))
            ThreePointArc((13.9150646707, 13.8684569817), (14.8809903029, 15.5414897832), (13.2079580316, 14.5755632326))
            Line((13.2079580316, 14.5755632326), (10.9904227081, 12.3580254744))
            Line((10.9904227081, 12.3580254744), (10.3304655668, 11.6952957055))
            Line((10.3304655668, 11.6952957055), (9.9919033945, 10.9452957055))
        make_face()
        with BuildLine():
            Line((26.0080966055, 8.9452957055), (26.0080966055, 10.9452957055))
            Line((26.0080966055, 10.9452957055), (25.6695344332, 11.6952957055))
            Line((25.6695344332, 11.6952957055), (25.0095772919, 12.3580254744))
            Line((25.0095772919, 12.3580254744), (22.7920419684, 14.5755632326))
            ThreePointArc((22.7920419684, 14.5755632326), (21.1190096971, 15.5414897832), (22.0849353293, 13.8684569817))
            Line((22.0849353293, 13.8684569817), (25.0080966055, 10.9452957055))
            Line((25.0080966055, 10.9452957055), (25.0080966055, 9.4452957055))
            Line((25.0080966055, 9.4452957055), (25.0080966055, 8.9452957055))
            Line((25.0080966055, 8.9452957055), (25.0080966055, 8.4452957055))
            Line((25.0080966055, 8.4452957055), (25.0080966055, 6.9452957055))
            Line((25.0080966055, 6.9452957055), (22.0849353293, 4.0221344294))
            ThreePointArc((22.0849353293, 4.0221344294), (21.1190096971, 2.3491016278), (22.7920419684, 3.3150281785))
            Line((22.7920419684, 3.3150281785), (25.0095772919, 5.5325659367))
            Line((25.0095772919, 5.5325659367), (25.6695344332, 6.1952957055))
            Line((25.6695344332, 6.1952957055), (26.0080966055, 6.9452957055))
            Line((26.0080966055, 6.9452957055), (26.0080966055, 8.9452957055))
        make_face()
        with BuildLine():
            Line((28.3466587777, 11.6952957055), (28.0080966055, 10.9452957055))
            Line((28.0080966055, 10.9452957055), (28.0080966055, 8.9452957055))
            Line((28.0080966055, 8.9452957055), (28.0080966055, 6.9452957055))
            Line((28.0080966055, 6.9452957055), (28.3466587777, 6.1952957055))
            Line((28.3466587777, 6.1952957055), (29.006615919, 5.5325659367))
            Line((29.006615919, 5.5325659367), (31.2241512425, 3.3150281785))
            ThreePointArc((31.2241512425, 3.3150281785), (32.8971835138, 2.3491016278), (31.9312578816, 4.0221344294))
            Line((31.9312578816, 4.0221344294), (29.0080966055, 6.9452957055))
            Line((29.0080966055, 6.9452957055), (29.0080966055, 8.4452957055))
            Line((29.0080966055, 8.4452957055), (29.0080966055, 8.9452957055))
            Line((29.0080966055, 8.9452957055), (29.0080966055, 9.4452957055))
            Line((29.0080966055, 9.4452957055), (29.0080966055, 10.9452957055))
            Line((29.0080966055, 10.9452957055), (31.9312578816, 13.8684569817))
            ThreePointArc((31.9312578816, 13.8684569817), (32.8971835138, 15.5414897832), (31.2241512425, 14.5755632326))
            Line((31.2241512425, 14.5755632326), (29.006615919, 12.3580254744))
            Line((29.006615919, 12.3580254744), (28.3466587777, 11.6952957055))
        make_face()
    extrude(amount=F2_DEPTH)

    # F0 (on Top) → F3 (join)
    with BuildSketch(Plane.XY):
        with BuildLine():
            Line((9.9919033945, 6.9452957055), (9.9919033945, 8.9452957055))
            Line((9.9919033945, 8.9452957055), (9.9919033945, 10.9452957055))
            Line((9.9919033945, 10.9452957055), (9.6533412223, 11.6952957055))
            ThreePointArc((9.6533412223, 11.6952957055), (8.9919033945, 13.4452957055), (8.3304655668, 11.6952957055))
            Line((8.3304655668, 11.6952957055), (7.9919033945, 10.9452957055))
            Line((7.9919033945, 10.9452957055), (7.9919033945, 8.9452957055))
            Line((7.9919033945, 8.9452957055), (7.9919033945, 6.9452957055))
            Line((7.9919033945, 6.9452957055), (8.3304655668, 6.1952957055))
            ThreePointArc((8.3304655668, 6.1952957055), (8.9919033945, 4.4452957055), (9.6533412223, 6.1952957055))
            Line((9.6533412223, 6.1952957055), (9.9919033945, 6.9452957055))
        make_face()
        with BuildLine():
            ThreePointArc((8.9919033945, 9.1952957055), (9.1686800898, 9.1220724008), (9.2419033945, 8.9452957055))
            ThreePointArc((9.2419033945, 8.9452957055), (9.1686800898, 8.7685190102), (8.9919033945, 8.6952957055))
            ThreePointArc((8.9919033945, 8.6952957055), (8.7419033945, 8.9452957055), (8.9919033945, 9.1952957055))
        make_face(mode=Mode.SUBTRACT)
        with BuildLine():
            Line((13.6148667214, 9.4452957055), (10.9919033945, 9.4452957055))
            Line((10.9919033945, 9.4452957055), (10.9919033945, 8.9452957055))
            Line((10.9919033945, 8.9452957055), (10.9919033945, 8.4452957055))
            Line((10.9919033945, 8.4452957055), (13.6148667214, 8.4452957055))
            ThreePointArc((13.6148667214, 8.4452957055), (14.9138690208, 8.823141097), (13.8052234095, 9.5984339593))
            ThreePointArc((13.8052234095, 9.5984339593), (13.70376764, 9.5296679116), (13.6148667214, 9.4452957055))
        make_face()
        with BuildLine():
            Line((6.9919033945, 8.9452957055), (6.9919033945, 9.4452957055))
            Line((6.9919033945, 9.4452957055), (4.3689400677, 9.4452957055))
            ThreePointArc((4.3689400677, 9.4452957055), (4.2800391491, 9.5296679116), (4.1785833795, 9.5984339593))
            ThreePointArc((4.1785833795, 9.5984339593), (3.0699377683, 8.823141097), (4.3689400677, 8.4452957055))
            Line((4.3689400677, 8.4452957055), (6.9919033945, 8.4452957055))
            Line((6.9919033945, 8.4452957055), (6.9919033945, 8.9452957055))
        make_face()
        with BuildLine():
            Line((25.0080966055, 8.9452957055), (25.0080966055, 9.4452957055))
            Line((25.0080966055, 9.4452957055), (22.3851332786, 9.4452957055))
            ThreePointArc((22.3851332786, 9.4452957055), (22.29623236, 9.5296679116), (22.1947765905, 9.5984339593))
            ThreePointArc((22.1947765905, 9.5984339593), (21.0861309792, 8.823141097), (22.3851332786, 8.4452957055))
            Line((22.3851332786, 8.4452957055), (25.0080966055, 8.4452957055))
            Line((25.0080966055, 8.4452957055), (25.0080966055, 8.9452957055))
        make_face()
        with BuildLine():
            Line((28.0080966055, 8.9452957055), (28.0080966055, 10.9452957055))
            Line((28.0080966055, 10.9452957055), (27.6695344332, 11.6952957055))
            ThreePointArc((27.6695344332, 11.6952957055), (27.0080966055, 13.4452957055), (26.3466587777, 11.6952957055))
            Line((26.3466587777, 11.6952957055), (26.0080966055, 10.9452957055))
            Line((26.0080966055, 10.9452957055), (26.0080966055, 8.9452957055))
            Line((26.0080966055, 8.9452957055), (26.0080966055, 6.9452957055))
            Line((26.0080966055, 6.9452957055), (26.3466587777, 6.1952957055))
            ThreePointArc((26.3466587777, 6.1952957055), (27.0080966055, 4.4452957055), (27.6695344332, 6.1952957055))
            Line((27.6695344332, 6.1952957055), (28.0080966055, 6.9452957055))
            Line((28.0080966055, 6.9452957055), (28.0080966055, 8.9452957055))
        make_face()
        with BuildLine():
            ThreePointArc((27.0080966055, 9.1952957055), (27.1848733008, 9.1220724008), (27.2580966055, 8.9452957055))
            ThreePointArc((27.2580966055, 8.9452957055), (27.1848733008, 8.7685190102), (27.0080966055, 8.6952957055))
            ThreePointArc((27.0080966055, 8.6952957055), (26.7580966055, 8.9452957055), (27.0080966055, 9.1952957055))
        make_face(mode=Mode.SUBTRACT)
        with BuildLine():
            Line((31.6310599323, 9.4452957055), (29.0080966055, 9.4452957055))
            Line((29.0080966055, 9.4452957055), (29.0080966055, 8.9452957055))
            Line((29.0080966055, 8.9452957055), (29.0080966055, 8.4452957055))
            Line((29.0080966055, 8.4452957055), (31.6310599323, 8.4452957055))
            ThreePointArc((31.6310599323, 8.4452957055), (32.9300622317, 8.823141097), (31.8214166205, 9.5984339593))
            ThreePointArc((31.8214166205, 9.5984339593), (31.7199608509, 9.5296679116), (31.6310599323, 9.4452957055))
        make_face()
    extrude(amount=F3_DEPTH)


solid = f1.part
